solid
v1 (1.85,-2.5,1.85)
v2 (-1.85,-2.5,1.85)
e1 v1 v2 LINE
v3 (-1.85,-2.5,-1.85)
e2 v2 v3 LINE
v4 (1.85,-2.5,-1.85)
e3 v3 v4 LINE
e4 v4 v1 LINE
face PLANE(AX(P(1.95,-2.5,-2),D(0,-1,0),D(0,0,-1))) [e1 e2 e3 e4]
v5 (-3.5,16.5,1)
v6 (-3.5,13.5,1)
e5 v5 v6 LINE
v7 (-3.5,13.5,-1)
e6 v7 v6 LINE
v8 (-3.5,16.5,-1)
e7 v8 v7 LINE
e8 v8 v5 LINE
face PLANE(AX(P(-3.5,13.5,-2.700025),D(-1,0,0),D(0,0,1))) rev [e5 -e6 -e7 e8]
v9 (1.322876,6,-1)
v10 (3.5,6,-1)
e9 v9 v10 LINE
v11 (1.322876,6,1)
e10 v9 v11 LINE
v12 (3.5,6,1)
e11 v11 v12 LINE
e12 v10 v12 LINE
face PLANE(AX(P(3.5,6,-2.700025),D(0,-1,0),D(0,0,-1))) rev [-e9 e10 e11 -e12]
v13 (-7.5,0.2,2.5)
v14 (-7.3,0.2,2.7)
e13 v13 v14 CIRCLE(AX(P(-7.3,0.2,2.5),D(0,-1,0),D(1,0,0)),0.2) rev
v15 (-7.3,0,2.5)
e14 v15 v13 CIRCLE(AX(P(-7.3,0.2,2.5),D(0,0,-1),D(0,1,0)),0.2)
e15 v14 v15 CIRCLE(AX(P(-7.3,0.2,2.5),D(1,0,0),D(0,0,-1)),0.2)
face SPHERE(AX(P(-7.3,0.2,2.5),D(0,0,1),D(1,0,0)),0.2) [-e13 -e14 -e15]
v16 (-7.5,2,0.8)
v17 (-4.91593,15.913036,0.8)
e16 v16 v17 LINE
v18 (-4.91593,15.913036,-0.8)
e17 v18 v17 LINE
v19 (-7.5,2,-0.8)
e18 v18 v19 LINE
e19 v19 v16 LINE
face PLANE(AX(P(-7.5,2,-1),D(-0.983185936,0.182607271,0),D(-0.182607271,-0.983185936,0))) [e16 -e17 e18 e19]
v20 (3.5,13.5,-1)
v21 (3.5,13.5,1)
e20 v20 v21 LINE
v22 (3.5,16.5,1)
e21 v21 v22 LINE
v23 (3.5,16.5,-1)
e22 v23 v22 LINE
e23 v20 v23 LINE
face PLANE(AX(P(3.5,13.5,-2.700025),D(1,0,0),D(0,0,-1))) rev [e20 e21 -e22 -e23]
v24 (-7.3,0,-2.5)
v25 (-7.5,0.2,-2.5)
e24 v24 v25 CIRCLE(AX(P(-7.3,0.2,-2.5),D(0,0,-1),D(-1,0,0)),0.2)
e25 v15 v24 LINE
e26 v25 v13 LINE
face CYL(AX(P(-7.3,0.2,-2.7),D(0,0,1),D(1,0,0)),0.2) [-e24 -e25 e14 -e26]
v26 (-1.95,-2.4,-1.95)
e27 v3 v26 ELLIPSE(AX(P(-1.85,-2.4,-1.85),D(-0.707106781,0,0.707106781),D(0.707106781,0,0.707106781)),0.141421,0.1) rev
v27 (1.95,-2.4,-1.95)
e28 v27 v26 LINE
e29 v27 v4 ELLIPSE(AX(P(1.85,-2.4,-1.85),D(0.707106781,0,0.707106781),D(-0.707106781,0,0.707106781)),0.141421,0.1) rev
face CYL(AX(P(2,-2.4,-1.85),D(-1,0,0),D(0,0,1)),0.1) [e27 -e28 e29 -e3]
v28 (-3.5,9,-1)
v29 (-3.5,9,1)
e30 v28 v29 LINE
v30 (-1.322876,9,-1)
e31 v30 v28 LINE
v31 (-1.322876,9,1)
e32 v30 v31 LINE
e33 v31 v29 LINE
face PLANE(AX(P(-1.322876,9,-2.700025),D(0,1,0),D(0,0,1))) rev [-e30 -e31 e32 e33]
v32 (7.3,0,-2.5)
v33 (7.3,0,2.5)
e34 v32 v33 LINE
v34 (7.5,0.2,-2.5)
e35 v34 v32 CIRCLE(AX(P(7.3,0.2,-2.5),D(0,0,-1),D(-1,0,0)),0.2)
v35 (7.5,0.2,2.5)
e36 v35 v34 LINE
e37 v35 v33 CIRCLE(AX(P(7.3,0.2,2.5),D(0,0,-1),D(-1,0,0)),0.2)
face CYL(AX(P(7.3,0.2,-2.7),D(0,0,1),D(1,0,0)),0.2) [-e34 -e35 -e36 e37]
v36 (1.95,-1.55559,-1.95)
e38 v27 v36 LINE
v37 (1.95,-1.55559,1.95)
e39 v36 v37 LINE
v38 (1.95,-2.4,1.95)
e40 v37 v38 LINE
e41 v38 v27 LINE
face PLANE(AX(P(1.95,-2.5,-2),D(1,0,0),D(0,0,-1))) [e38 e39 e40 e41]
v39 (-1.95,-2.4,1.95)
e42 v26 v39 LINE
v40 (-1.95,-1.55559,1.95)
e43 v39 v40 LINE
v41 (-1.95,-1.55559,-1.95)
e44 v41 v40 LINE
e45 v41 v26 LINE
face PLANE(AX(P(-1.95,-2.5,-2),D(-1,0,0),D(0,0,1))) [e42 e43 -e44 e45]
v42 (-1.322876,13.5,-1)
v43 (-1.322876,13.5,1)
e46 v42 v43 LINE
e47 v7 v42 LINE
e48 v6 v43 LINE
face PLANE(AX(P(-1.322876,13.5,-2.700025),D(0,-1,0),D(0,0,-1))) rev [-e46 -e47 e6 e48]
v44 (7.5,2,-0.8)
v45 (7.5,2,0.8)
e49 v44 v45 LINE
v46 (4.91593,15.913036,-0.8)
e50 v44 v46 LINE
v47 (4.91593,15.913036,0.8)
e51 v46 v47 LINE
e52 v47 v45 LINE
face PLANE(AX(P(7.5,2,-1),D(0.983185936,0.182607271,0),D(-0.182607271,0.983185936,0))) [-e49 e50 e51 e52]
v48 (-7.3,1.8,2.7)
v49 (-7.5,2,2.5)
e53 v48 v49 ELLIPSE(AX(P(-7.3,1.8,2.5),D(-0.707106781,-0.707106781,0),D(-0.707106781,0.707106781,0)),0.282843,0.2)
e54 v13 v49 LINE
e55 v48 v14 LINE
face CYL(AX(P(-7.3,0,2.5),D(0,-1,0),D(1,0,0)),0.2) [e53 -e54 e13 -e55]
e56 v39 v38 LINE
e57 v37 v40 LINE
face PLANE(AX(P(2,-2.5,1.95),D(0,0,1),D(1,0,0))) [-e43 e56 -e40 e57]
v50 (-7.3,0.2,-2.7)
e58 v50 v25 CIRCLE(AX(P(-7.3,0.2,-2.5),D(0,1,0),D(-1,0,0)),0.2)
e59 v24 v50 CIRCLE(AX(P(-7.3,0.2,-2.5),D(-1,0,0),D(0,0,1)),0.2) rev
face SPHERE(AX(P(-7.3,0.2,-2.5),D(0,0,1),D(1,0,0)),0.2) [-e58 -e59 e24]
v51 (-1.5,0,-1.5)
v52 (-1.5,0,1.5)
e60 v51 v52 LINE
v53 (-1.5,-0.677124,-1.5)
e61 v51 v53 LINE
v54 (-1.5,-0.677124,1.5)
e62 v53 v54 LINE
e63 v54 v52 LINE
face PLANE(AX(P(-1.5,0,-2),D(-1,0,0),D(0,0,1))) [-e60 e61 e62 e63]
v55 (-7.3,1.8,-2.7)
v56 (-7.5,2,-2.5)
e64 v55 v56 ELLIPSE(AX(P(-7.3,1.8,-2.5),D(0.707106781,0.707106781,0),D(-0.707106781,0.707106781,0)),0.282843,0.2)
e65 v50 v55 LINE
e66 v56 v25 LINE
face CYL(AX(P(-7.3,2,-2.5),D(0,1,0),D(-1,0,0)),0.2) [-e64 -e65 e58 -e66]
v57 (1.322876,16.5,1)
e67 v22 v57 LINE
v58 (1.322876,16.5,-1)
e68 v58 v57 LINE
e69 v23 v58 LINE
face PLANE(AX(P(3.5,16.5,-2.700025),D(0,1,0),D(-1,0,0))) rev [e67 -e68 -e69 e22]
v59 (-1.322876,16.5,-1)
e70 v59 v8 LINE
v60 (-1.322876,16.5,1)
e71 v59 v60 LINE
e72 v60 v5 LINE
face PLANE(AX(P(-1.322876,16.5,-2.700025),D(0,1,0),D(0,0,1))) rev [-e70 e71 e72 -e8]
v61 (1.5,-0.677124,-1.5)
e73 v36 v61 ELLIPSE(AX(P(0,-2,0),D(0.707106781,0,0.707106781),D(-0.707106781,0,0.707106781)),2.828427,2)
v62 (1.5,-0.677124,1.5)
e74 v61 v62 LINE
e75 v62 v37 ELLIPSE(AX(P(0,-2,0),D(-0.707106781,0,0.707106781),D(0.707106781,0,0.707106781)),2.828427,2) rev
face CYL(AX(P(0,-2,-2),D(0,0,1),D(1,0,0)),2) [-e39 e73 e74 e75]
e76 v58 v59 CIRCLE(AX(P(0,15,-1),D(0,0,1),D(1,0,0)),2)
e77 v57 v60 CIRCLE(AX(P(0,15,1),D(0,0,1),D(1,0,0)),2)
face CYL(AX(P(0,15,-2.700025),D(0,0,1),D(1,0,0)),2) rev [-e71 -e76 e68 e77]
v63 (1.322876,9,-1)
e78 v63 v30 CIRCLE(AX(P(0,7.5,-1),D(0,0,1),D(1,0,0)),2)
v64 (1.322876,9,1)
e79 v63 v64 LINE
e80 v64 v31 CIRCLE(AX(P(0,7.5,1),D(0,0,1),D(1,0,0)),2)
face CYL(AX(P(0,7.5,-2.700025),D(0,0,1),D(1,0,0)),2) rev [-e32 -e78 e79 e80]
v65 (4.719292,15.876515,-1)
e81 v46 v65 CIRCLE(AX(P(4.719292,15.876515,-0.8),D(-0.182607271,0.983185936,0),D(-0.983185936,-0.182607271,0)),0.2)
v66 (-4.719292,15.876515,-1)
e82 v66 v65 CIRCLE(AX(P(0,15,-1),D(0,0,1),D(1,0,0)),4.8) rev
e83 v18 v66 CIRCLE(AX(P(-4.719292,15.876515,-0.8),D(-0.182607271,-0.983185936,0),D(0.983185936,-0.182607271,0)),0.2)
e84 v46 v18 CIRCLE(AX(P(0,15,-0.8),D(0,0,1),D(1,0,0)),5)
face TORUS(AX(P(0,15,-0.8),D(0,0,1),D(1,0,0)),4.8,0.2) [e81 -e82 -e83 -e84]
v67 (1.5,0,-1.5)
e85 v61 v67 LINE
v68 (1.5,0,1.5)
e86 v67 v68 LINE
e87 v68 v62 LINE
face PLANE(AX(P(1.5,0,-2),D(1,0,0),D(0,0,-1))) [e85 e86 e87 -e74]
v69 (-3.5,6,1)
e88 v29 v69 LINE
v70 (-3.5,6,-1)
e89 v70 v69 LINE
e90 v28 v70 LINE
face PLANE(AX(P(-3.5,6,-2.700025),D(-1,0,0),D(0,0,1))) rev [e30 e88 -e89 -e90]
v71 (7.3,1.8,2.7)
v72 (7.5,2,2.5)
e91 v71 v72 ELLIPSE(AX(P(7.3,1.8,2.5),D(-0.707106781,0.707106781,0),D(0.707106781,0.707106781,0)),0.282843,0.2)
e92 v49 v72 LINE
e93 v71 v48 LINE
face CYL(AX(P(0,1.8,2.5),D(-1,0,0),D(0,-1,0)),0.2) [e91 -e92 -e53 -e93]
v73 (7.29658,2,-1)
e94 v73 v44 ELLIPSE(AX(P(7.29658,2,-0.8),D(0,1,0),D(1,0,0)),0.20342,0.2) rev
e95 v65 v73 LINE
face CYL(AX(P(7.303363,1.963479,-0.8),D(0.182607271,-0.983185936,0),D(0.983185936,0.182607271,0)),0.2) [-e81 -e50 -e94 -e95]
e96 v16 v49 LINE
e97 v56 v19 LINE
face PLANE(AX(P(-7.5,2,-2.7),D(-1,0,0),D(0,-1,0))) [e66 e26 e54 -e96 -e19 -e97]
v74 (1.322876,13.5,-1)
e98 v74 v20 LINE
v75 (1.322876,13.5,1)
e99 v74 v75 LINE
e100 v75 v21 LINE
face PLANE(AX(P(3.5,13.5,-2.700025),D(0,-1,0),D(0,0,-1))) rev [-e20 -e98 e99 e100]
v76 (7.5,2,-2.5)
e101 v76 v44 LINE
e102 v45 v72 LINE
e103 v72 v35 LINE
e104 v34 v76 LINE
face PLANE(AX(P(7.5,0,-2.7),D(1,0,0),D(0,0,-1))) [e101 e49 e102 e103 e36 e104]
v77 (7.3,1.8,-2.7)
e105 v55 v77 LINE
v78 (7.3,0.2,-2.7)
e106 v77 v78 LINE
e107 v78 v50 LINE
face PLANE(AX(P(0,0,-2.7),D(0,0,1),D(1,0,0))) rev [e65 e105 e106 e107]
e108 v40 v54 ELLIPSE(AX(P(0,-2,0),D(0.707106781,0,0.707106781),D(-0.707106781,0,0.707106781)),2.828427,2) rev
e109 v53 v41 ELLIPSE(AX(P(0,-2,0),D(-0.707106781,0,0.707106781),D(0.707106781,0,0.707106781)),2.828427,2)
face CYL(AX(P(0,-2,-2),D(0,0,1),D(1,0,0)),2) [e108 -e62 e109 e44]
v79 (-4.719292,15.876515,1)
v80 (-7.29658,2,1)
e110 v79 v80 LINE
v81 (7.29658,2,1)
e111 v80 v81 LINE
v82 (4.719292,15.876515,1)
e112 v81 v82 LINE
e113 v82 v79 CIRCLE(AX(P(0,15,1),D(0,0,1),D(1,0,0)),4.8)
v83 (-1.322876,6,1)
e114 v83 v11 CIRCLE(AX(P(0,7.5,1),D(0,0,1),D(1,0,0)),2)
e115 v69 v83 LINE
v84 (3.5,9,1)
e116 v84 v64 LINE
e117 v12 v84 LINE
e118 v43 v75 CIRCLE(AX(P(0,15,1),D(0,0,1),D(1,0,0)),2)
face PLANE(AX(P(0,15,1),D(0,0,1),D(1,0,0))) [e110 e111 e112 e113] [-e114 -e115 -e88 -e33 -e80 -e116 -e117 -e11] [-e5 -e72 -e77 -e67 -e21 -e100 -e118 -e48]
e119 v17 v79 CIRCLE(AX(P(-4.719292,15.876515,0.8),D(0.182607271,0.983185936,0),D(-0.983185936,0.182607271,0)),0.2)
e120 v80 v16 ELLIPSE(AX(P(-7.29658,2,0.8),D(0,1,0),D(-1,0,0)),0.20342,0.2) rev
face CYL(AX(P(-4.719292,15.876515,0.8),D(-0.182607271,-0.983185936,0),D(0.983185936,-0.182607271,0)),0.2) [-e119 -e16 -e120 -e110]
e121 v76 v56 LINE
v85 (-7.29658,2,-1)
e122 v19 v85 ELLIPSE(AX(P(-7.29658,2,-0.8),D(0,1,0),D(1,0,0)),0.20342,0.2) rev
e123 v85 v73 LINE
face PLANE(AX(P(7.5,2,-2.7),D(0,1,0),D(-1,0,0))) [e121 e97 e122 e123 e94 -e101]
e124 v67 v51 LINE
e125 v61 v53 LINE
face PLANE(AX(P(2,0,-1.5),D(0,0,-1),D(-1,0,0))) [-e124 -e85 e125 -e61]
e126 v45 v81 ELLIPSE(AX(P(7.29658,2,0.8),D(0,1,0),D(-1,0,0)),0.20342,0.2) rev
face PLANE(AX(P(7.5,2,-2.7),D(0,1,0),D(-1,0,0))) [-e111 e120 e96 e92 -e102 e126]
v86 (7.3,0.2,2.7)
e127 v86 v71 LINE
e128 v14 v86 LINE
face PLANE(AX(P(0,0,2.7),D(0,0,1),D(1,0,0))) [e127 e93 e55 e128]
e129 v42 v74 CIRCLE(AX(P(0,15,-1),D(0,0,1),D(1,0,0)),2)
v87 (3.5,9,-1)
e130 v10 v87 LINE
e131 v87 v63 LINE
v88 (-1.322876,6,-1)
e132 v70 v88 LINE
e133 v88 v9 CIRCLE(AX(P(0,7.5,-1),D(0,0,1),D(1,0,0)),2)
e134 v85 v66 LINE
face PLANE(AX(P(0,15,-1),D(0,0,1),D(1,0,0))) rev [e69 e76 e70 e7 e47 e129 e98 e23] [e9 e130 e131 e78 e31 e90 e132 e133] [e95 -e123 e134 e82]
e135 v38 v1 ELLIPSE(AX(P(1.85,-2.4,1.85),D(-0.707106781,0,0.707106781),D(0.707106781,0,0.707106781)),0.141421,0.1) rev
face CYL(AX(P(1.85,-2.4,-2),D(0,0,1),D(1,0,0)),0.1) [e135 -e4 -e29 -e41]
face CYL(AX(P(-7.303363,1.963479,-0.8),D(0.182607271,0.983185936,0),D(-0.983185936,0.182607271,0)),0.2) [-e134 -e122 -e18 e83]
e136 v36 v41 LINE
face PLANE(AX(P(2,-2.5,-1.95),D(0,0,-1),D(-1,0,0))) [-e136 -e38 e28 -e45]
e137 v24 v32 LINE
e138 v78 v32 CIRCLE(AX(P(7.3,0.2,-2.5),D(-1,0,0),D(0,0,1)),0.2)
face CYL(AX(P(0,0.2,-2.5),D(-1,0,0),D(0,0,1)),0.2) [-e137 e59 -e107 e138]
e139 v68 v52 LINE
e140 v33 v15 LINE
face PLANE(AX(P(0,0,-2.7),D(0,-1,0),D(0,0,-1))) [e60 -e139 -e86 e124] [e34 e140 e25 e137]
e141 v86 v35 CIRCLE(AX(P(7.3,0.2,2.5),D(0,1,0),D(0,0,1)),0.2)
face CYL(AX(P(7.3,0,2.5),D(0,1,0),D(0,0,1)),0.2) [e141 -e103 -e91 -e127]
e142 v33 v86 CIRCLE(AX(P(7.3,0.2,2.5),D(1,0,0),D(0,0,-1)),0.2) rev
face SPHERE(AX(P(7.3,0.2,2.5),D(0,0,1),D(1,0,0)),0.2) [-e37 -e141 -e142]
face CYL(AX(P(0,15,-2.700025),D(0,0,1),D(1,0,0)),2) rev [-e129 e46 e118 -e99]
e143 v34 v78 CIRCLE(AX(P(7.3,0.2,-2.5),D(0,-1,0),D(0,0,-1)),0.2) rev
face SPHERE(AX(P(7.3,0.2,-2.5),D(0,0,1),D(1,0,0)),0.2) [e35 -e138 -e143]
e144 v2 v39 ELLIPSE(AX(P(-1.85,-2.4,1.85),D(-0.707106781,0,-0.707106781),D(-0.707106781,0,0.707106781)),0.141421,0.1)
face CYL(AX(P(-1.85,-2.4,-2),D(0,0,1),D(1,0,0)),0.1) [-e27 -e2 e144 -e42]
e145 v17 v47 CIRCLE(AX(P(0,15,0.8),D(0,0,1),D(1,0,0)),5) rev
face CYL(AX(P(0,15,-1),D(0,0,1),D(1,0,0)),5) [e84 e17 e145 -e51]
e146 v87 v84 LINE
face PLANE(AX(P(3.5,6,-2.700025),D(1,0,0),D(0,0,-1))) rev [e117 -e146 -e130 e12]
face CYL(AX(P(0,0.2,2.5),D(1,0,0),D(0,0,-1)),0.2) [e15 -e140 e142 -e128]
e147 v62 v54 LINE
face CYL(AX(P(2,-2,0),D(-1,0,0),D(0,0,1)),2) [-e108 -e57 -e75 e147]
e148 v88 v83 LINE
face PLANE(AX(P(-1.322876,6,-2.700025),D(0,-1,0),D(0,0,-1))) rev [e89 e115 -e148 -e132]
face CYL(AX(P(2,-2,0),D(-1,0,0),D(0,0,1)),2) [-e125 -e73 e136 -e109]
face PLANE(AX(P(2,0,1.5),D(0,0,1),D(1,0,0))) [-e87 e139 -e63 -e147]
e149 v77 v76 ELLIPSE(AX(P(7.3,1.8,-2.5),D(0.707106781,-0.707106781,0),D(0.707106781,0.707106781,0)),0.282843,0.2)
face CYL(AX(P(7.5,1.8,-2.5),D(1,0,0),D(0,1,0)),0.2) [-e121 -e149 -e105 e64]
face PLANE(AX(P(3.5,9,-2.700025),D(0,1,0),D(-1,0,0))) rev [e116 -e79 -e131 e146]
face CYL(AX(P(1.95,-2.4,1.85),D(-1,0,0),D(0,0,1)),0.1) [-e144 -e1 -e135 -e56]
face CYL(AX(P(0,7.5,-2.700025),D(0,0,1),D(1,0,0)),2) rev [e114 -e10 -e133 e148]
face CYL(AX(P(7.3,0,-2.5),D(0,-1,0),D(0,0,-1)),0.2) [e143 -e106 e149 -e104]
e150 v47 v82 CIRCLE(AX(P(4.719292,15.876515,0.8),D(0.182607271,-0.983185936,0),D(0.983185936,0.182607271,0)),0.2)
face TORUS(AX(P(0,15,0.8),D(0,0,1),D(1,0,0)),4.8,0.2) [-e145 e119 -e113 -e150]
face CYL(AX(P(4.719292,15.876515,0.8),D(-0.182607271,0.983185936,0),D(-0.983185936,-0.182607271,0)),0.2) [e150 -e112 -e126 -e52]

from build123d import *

# Parameters (mm, degrees)
EXTRUDE_1_DEPTH          = 2.7
EXTRUDE_1_DEPTH_BACK     = 2.7
EXTRUDE_2_DEPTH          = 1
EXTRUDE_2_DEPTH_BACK     = 1
CUT_EXTRUDE_1_DEPTH      = 22.678099548
PATTERN_LINEAR_1_COUNT   = 2
PATTERN_LINEAR_1_PITCH   = 7.5
EXTRUDE_3_DEPTH          = 2
EXTRUDE_3_DEPTH_BACK     = 2
CUT_EXTRUDE_2_DEPTH      = 2
CUT_EXTRUDE_2_DEPTH_BACK = 2
FILLET_1_R               = 0.1
FILLET_4_R               = 0.2
FILLET_5_R               = 0.2
FILLET_7_R               = 0.2


with BuildPart() as part:
    # 草图1 → 凸台-拉伸1 (new, two sides: drawn at the far end of the back side and taken through both)
    with BuildSketch(Plane.XY.offset(-EXTRUDE_1_DEPTH_BACK)):
        Polygon((0, 0), (7.5, 0), (7.5, 2), (-7.5, 2), (-7.5, 0), align=None)
    extrude(amount=EXTRUDE_1_DEPTH + EXTRUDE_1_DEPTH_BACK)

    # 草图2 → 凸台-拉伸2 (add, two sides: drawn at the far end of the back side and taken through both)
    with BuildSketch(Plane.XY.offset(-EXTRUDE_2_DEPTH_BACK)):
        with BuildLine():
            Line((-7.5, 2), (-4.91592968, 15.913036354))
            ThreePointArc((-4.91592968, 15.913036354), (0, 20), (4.91592968, 15.913036354))
            Line((4.91592968, 15.913036354), (7.5, 2))
            Line((7.5, 2), (-7.5, 2))
        make_face()
    extrude(amount=EXTRUDE_2_DEPTH + EXTRUDE_2_DEPTH_BACK)

    # 草图3 → 切除-拉伸1 (cut, through all)
    with BuildSketch(Plane.XY.offset(1)):
        with BuildLine():
            Line((3.5, 6), (3.5, 9))
            Line((3.5, 9), (1.322875656, 9))
            ThreePointArc((1.322875656, 9), (0, 9.5), (-1.322875656, 9))
            Line((-1.322875656, 9), (-3.5, 9))
            Line((-3.5, 9), (-3.5, 6))
            Line((-3.5, 6), (-1.322875656, 6))
            ThreePointArc((-1.322875656, 6), (0, 5.5), (1.322875656, 6))
            Line((1.322875656, 6), (3.5, 6))
        make_face()
    cut_extrude_1 = extrude(amount=-CUT_EXTRUDE_1_DEPTH, mode=Mode.SUBTRACT)

    # 阵列(线性)1: 切除-拉伸1 ×2
    with Locations(*[(0, i * PATTERN_LINEAR_1_PITCH, 0) for i in range(1, PATTERN_LINEAR_1_COUNT)]):
        add(cut_extrude_1, mode=Mode.SUBTRACT)

    # 草图4 → 凸台-拉伸3 (add, two sides: drawn at the far end of the back side and taken through both)
    with BuildSketch(Plane.XY.offset(-EXTRUDE_3_DEPTH_BACK)):
        with BuildLine():
            Line((1.5, 0), (-1.5, 0))
            Line((-1.5, 0), (-1.5, -0.677124344))
            ThreePointArc((-1.5, -0.677124344), (-1.780042303, -1.088161527), (-1.95, -1.555590279))
            Line((-1.95, -1.555590279), (-1.95, -2.5))
            Line((-1.95, -2.5), (1.95, -2.5))
            Line((1.95, -2.5), (1.95, -1.555590279))
            ThreePointArc((1.95, -1.555590279), (1.780042303, -1.088161527), (1.5, -0.677124344))
            Line((1.5, -0.677124344), (1.5, 0))
        make_face()
    extrude(amount=EXTRUDE_3_DEPTH + EXTRUDE_3_DEPTH_BACK)

    # 草图5 → 切除-拉伸2 (cut, two sides: drawn at the far end of the back side and taken through both)
    with BuildSketch(Plane(origin=(0, 0, 0), x_dir=(0, 0, -1), z_dir=(1, 0, 0)).offset(-CUT_EXTRUDE_2_DEPTH_BACK)):
        with BuildLine():
            Line((1.5, 0), (1.5, -0.677124344))
            ThreePointArc((1.5, -0.677124344), (1.780042303, -1.088161527), (1.95, -1.555590279))
            Line((1.95, -1.555590279), (1.95, -2.5))
            Line((1.95, -2.5), (2, -2.5))
            Line((2, -2.5), (2, 0))
            Line((2, 0), (1.5, 0))
        make_face()
        with BuildLine():
            Line((-2, 0), (-1.5, 0))
            Line((-1.5, 0), (-1.5, -0.677124344))
            ThreePointArc((-1.5, -0.677124344), (-1.780042303, -1.088161527), (-1.95, -1.555590279))
            Line((-1.95, -1.555590279), (-1.95, -2.5))
            Line((-1.95, -2.5), (-2, -2.5))
            Line((-2, -2.5), (-2, 0))
        make_face()
    extrude(amount=CUT_EXTRUDE_2_DEPTH + CUT_EXTRUDE_2_DEPTH_BACK, mode=Mode.SUBTRACT)

    # 圆角1
    fillet_1_edges = [part.edges().sort_by_distance(p)[0] for p in [
        (-1.95, -2.5, 0),
        (1.95, -2.5, 0),
        (0, -2.5, -1.95),
        (0, -2.5, 1.95),
    ]]
    fillet(fillet_1_edges, radius=FILLET_1_R)

    # 圆角4
    fillet_4_edges = [part.edges().sort_by_distance(p)[0] for p in [
        (-7.5, 1, 2.7),
        (0, 2, 2.7),
        (7.5, 1, 2.7),
        (0, 0, 2.7),
        (7.5, 1, -2.7),
        (0, 2, -2.7),
        (-7.5, 1, -2.7),
        (0, 0, -2.7),
    ]]
    fillet(fillet_4_edges, radius=FILLET_4_R)

    # 圆角5
    # the kernel refuses this fillet: 0.2 mm, written as the material it takes off along each edge
    with BuildSketch(Plane(origin=(7.3, 0.2, 2.5), x_dir=(1, 0, 0), z_dir=(0, -1, 0))) as fillet_5_piece_1_section:
        Polygon((0, 0), (FILLET_5_R, 0), (FILLET_5_R, FILLET_5_R), (0, FILLET_5_R), align=None)
    fillet_5_piece_1 = extrude(amount=FILLET_5_R, mode=Mode.PRIVATE)
    fillet_5_piece_1 = fillet_5_piece_1 - Plane(origin=(7.3, 0.2, 2.5), x_dir=(-0.7071067811865475, 0, -0.7071067811865475), z_dir=(0, -1, 0)) * Sphere(FILLET_5_R, mode=Mode.PRIVATE)
    add(fillet_5_piece_1, mode=Mode.SUBTRACT)
    with BuildSketch(Plane(origin=(-7.3, 0.2, 2.5), x_dir=(-1, 0, 0), z_dir=(0, -1, 0))) as fillet_5_piece_2_section:
        Polygon((0, 0), (FILLET_5_R, 0), (FILLET_5_R, -FILLET_5_R), (0, -FILLET_5_R), align=None)
    fillet_5_piece_2 = extrude(amount=FILLET_5_R, mode=Mode.PRIVATE)
    fillet_5_piece_2 = fillet_5_piece_2 - Plane(origin=(-7.3, 0.2, 2.5), x_dir=(0.7071067811865475, 1.2560739669470211e-15, -0.7071067811865475), z_dir=(0, -1, 0)) * Sphere(FILLET_5_R, mode=Mode.PRIVATE)
    add(fillet_5_piece_2, mode=Mode.SUBTRACT)
    with BuildSketch(Plane(origin=(-7.3, 0.2, -2.5), x_dir=(-1, 0, 0), z_dir=(0, -1, 0))) as fillet_5_piece_3_section:
        Polygon((0, 0), (FILLET_5_R, 0), (FILLET_5_R, FILLET_5_R), (0, FILLET_5_R), align=None)
    fillet_5_piece_3 = extrude(amount=FILLET_5_R, mode=Mode.PRIVATE)
    fillet_5_piece_3 = fillet_5_piece_3 - Plane(origin=(-7.3, 0.2, -2.5), x_dir=(0.7071067811865475, 1.2560739669470211e-15, 0.7071067811865475), z_dir=(0, -1, 0)) * Sphere(FILLET_5_R, mode=Mode.PRIVATE)
    add(fillet_5_piece_3, mode=Mode.SUBTRACT)
    with BuildSketch(Plane(origin=(7.3, 0.2, -2.5), x_dir=(1, 0, 0), z_dir=(0, -1, 0))) as fillet_5_piece_4_section:
        Polygon((0, 0), (FILLET_5_R, 0), (FILLET_5_R, -FILLET_5_R), (0, -FILLET_5_R), align=None)
    fillet_5_piece_4 = extrude(amount=FILLET_5_R, mode=Mode.PRIVATE)
    fillet_5_piece_4 = fillet_5_piece_4 - Plane(origin=(7.3, 0.2, -2.5), x_dir=(-0.7071067811865475, 0, 0.7071067811865475), z_dir=(0, -1, 0)) * Sphere(FILLET_5_R, mode=Mode.PRIVATE)
    add(fillet_5_piece_4, mode=Mode.SUBTRACT)
    with BuildSketch(Plane(origin=(-7.5, 0, 2.5), x_dir=(1, 0, 0), z_dir=(0, 0, -1)), Plane(origin=(7.5, 0, -2.5), x_dir=(-1, 0, 0), z_dir=(0, 0, 1))) as fillet_5_piece_5:
        with BuildLine():
            CenterArc((FILLET_5_R, -FILLET_5_R), FILLET_5_R, 90, 90)
            Line((0, -FILLET_5_R), (0, 0))
            Line((0, 0), (FILLET_5_R, 0))
        make_face()
    extrude(amount=5, mode=Mode.SUBTRACT)

    # 圆角7
    fillet_7_edges = [part.edges().sort_by_distance(p)[0] for p in [
        (6.20796484, 8.956518177, 1),
        (0, 20, 1),
        (-6.20796484, 8.956518177, 1),
        (-6.20796484, 8.956518177, -1),
        (0, 20, -1),
        (6.20796484, 8.956518177, -1),
    ]]
    fillet(fillet_7_edges, radius=FILLET_7_R)


solid = part.part
